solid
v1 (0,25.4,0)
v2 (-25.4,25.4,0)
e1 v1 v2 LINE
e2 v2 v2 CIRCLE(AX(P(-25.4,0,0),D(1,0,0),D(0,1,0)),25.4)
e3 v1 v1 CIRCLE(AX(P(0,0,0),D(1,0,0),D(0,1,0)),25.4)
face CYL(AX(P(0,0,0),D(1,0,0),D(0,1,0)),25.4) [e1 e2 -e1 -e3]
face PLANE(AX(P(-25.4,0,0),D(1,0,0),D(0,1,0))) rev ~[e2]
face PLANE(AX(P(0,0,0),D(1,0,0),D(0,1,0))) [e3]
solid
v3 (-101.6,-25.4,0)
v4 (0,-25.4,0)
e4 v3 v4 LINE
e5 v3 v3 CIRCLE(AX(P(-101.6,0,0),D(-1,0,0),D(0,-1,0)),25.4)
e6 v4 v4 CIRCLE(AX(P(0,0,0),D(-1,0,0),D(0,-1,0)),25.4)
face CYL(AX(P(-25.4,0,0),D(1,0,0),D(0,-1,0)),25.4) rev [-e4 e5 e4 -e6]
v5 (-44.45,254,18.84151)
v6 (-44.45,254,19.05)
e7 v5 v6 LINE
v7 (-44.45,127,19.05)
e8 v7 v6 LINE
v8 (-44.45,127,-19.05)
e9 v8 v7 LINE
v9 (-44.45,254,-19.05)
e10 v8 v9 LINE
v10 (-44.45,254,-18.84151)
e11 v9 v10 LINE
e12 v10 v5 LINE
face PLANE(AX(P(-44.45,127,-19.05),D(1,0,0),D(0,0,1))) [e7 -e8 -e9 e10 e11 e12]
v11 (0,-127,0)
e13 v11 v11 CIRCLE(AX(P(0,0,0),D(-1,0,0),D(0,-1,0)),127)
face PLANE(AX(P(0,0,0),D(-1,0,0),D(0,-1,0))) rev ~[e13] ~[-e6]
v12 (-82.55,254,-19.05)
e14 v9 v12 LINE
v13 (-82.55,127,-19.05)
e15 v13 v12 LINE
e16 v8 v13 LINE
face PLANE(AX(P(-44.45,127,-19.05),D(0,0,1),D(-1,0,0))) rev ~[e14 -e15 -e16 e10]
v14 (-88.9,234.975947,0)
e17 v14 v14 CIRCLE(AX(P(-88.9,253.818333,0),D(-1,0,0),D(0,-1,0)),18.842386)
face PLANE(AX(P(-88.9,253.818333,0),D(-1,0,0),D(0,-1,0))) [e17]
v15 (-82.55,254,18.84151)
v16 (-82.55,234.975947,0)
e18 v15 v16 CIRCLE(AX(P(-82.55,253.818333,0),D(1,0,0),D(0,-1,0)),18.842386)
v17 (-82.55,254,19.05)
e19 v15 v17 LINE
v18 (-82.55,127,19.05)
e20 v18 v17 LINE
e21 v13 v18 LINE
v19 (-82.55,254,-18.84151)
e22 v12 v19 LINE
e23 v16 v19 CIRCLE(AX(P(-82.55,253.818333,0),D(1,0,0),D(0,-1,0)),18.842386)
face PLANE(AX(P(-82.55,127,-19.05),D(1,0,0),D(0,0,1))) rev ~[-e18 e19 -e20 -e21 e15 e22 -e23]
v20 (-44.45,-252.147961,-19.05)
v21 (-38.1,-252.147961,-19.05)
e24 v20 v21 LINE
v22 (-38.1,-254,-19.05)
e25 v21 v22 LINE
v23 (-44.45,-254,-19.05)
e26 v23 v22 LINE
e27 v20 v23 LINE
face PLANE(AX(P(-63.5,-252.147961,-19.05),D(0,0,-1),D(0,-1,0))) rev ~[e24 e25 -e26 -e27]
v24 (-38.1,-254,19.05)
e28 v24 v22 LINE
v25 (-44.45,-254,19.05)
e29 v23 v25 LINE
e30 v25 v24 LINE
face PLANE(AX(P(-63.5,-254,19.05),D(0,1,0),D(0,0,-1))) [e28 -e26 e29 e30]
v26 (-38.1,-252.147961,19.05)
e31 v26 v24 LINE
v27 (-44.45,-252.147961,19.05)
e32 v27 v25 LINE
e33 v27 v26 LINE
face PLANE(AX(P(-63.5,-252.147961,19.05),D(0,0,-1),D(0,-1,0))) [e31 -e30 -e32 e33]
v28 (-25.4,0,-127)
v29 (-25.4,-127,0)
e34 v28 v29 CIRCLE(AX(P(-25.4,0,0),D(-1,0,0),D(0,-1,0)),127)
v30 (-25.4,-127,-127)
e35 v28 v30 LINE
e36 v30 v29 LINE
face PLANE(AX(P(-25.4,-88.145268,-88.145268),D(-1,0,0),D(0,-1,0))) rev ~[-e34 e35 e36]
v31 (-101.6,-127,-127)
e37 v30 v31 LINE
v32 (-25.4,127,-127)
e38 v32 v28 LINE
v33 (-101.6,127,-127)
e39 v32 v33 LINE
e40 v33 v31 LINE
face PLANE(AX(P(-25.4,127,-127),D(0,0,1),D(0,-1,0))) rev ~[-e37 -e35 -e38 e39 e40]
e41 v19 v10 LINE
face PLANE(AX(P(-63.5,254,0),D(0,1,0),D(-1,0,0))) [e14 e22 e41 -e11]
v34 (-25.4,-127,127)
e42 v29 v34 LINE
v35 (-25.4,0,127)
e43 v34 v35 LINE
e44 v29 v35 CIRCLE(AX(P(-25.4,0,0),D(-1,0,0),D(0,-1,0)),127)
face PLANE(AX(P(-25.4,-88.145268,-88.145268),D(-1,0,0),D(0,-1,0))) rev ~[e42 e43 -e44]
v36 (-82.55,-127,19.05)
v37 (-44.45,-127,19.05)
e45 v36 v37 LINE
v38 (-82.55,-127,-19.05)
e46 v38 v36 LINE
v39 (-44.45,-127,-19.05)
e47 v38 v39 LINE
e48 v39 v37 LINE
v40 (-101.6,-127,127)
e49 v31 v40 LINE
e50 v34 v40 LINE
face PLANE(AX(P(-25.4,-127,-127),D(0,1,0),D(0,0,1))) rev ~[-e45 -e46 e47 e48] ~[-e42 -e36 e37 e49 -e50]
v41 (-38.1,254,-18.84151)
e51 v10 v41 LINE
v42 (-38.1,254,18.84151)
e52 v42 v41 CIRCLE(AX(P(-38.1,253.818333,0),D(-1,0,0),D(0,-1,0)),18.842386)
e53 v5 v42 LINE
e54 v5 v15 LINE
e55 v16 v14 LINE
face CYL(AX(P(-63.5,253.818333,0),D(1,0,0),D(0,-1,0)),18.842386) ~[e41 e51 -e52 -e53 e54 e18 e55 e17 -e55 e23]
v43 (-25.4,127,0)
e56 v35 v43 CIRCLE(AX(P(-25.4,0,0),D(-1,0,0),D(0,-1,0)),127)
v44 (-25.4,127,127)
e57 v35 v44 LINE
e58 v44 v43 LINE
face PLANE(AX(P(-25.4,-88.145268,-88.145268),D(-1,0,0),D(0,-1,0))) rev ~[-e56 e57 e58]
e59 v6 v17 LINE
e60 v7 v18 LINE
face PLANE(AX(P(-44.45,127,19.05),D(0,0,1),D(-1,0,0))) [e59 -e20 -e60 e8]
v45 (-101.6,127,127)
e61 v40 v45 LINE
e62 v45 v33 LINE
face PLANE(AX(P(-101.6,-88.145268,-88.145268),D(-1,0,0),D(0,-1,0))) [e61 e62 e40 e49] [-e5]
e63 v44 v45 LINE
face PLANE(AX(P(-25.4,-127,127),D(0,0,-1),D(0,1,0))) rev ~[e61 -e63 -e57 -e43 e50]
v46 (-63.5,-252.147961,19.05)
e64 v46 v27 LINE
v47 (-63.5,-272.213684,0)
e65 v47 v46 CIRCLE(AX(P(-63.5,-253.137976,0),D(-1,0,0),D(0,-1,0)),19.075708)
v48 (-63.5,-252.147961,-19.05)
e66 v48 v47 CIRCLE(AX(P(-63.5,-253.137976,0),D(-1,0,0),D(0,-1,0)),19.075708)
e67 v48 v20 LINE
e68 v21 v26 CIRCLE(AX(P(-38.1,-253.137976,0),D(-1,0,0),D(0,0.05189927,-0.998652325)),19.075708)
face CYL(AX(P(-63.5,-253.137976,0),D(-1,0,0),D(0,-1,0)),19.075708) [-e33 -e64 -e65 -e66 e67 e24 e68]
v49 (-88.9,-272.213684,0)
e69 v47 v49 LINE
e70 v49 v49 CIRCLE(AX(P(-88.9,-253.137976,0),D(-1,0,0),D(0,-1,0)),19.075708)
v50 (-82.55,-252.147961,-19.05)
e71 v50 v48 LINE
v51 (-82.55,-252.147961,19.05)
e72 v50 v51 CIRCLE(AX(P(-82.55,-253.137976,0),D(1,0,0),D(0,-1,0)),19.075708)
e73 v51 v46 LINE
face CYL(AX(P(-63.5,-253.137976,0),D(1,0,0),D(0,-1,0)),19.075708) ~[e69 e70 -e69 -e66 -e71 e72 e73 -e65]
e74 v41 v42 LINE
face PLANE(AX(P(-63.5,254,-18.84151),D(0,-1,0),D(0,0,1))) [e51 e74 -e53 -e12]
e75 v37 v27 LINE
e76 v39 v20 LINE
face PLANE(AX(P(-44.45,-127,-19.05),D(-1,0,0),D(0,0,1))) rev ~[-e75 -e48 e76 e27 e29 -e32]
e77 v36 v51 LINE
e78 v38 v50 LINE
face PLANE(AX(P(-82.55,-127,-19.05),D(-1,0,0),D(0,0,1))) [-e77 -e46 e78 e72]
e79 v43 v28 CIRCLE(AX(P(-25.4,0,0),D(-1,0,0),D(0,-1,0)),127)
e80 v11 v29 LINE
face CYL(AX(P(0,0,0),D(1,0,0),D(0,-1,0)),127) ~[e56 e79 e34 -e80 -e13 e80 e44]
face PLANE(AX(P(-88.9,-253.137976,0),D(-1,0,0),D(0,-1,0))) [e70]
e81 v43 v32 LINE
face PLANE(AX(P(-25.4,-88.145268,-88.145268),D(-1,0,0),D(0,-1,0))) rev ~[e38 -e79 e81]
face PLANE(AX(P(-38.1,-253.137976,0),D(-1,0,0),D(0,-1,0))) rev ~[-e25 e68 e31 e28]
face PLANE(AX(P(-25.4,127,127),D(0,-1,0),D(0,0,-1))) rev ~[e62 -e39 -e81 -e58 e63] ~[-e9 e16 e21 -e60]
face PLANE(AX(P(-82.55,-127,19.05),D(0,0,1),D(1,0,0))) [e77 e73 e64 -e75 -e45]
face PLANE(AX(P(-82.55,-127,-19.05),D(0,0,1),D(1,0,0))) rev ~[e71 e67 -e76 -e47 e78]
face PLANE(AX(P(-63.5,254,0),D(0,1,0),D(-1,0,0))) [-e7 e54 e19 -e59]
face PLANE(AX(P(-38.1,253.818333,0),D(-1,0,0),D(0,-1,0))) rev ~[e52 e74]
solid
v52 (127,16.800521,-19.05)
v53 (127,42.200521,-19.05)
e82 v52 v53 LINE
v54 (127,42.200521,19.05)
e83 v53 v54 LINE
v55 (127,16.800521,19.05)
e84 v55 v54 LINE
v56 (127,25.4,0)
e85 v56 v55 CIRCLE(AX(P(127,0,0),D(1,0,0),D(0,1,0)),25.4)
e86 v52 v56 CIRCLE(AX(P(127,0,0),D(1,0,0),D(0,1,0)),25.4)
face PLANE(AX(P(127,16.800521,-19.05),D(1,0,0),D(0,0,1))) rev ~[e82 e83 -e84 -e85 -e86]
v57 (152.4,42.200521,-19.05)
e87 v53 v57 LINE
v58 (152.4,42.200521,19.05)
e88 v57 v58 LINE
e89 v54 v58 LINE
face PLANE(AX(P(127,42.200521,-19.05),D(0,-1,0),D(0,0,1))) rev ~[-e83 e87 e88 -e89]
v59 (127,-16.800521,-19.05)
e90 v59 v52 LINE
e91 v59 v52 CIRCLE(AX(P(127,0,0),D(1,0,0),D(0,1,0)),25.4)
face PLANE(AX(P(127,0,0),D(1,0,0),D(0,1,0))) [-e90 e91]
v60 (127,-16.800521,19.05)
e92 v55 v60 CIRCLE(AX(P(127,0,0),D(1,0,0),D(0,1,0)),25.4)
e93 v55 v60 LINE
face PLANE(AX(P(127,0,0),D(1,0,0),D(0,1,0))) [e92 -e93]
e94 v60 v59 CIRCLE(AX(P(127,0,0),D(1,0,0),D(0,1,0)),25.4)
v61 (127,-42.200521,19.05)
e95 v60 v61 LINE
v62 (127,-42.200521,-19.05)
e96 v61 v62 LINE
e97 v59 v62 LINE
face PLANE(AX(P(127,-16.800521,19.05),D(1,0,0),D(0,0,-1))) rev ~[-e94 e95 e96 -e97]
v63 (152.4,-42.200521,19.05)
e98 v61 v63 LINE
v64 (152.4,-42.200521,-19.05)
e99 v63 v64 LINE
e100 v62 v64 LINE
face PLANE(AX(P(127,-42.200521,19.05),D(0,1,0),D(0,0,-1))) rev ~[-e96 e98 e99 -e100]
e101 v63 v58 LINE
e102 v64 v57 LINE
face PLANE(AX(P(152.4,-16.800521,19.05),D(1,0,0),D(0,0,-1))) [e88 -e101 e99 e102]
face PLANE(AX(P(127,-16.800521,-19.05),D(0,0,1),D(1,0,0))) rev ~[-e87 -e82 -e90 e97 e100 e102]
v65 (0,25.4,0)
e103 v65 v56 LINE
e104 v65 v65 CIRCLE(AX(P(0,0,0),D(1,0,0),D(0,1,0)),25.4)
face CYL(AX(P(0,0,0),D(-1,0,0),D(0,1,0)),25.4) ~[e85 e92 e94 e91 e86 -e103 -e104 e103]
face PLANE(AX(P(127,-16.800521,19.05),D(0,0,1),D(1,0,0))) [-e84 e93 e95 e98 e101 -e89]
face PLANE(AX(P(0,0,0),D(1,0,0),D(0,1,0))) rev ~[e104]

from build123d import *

# Parameters (mm, degrees)
F0_R      = 25.4
F1_DEPTH  = 127
F3_DEPTH  = 25.4
F4_DEPTH  = 25.4
F5_DEPTH  = 25.4
F6_R      = 127
F6_R_2    = 25.4
F7_DEPTH  = 25.4
F8_DEPTH  = 25.4
F9_R      = 25.4
F10_DEPTH = 76.2
F11_W     = 38.1
F11_H     = 38.1
F12_DEPTH = 127
F13_W     = 38.1
F13_H     = 38.1
F14_DEPTH = 127
F16_R     = 18.8423860879
F17_DEPTH = 25.4
F18_DEPTH = 25.4
F19_R     = 19.0757078593
F20_DEPTH = 25.4
F21_DEPTH = 25.4


with BuildPart() as f1:
    # F0 (on Right) → F1 (new body)
    with BuildSketch(Plane.YZ):
        Circle(F0_R)
    extrude(amount=F1_DEPTH)

    # F2 (on face) → F3 (join)
    with BuildSketch(Plane.YZ.offset(127)):
        Polygon((16.8005208253, 0), (0, 0), (-16.8005208253, 0), (-16.8005208253, -19.05), (16.8005208253, -19.05), align=None)
        Polygon((-16.8005208253, 0), (0, 0), (16.8005208253, 0), (16.8005208253, 19.05), (-16.8005208253, 19.05), align=None)
    extrude(amount=F3_DEPTH)

    # F4 (add): a face of the model
    f4_faces = [f1.faces().sort_by_distance(p)[0] for p in [
        (139.7, 16.8005208253, 0),
    ]]
    extrude(f4_faces, amount=F4_DEPTH)

    # F5 (add): a face of the model
    f5_faces = [f1.faces().sort_by_distance(p)[0] for p in [
        (139.7, -16.8005208253, 0),
    ]]
    extrude(f5_faces, amount=F5_DEPTH)


with BuildPart() as f7:
    # F6 (on face) → F7 (new body)
    with BuildSketch(Plane(origin=(0, 0, 0), x_dir=(0, -1, 0), z_dir=(-1, 0, 0))):
        Circle(F6_R)
        Circle(F6_R_2, mode=Mode.SUBTRACT)
    extrude(amount=F7_DEPTH)

    # F9 (on face) → F10 (join)
    with BuildSketch(Plane(origin=(-25.4, 0, 0), x_dir=(0, -1, 0), z_dir=(-1, 0, 0))):
        with BuildLine():
            Line((1.902e-07, -127), (127, -127))
            Line((127, -127), (127, 0))
            ThreePointArc((127, 0), (89.8025612779, -89.8025611435), (1.902e-07, -127))
        make_face()
        with BuildLine():
            Line((-127, -127), (1.902e-07, -127))
            ThreePointArc((1.902e-07, -127), (-89.8025611147, -89.8025613067), (-127, -8.12e-08))
            Line((-127, -8.12e-08), (-127, -127))
        make_face()
        with BuildLine():
            ThreePointArc((-127, -8.12e-08), (-89.8025611147, -89.8025613067), (1.902e-07, -127))
            ThreePointArc((1.902e-07, -127), (89.8025612779, -89.8025611435), (127, 0))
            ThreePointArc((127, 0), (89.8025611483, 89.802561273), (-1.763e-07, 127))
            ThreePointArc((-1.763e-07, 127), (-89.8025613018, 89.8025611196), (-127, -8.12e-08))
        make_face()
        Circle(F9_R, mode=Mode.SUBTRACT)
        with BuildLine():
            ThreePointArc((-1.763e-07, 127), (89.8025611483, 89.802561273), (127, 0))
            Line((127, 0), (127, 127))
            Line((127, 127), (-1.763e-07, 127))
        make_face()
        with BuildLine():
            Line((-127, 127), (-127, -8.12e-08))
            ThreePointArc((-127, -8.12e-08), (-89.8025613018, 89.8025611196), (-1.763e-07, 127))
            Line((-1.763e-07, 127), (-127, 127))
        make_face()
    extrude(amount=F10_DEPTH)

    # F11 (on face) → F12 (join)
    with BuildSketch(Plane(origin=(0, 127, 0), x_dir=(-1, 0, 0), z_dir=(0, 1, 0))):
        with Locations((63.5, 0)):
            Rectangle(F11_W, F11_H)
    extrude(amount=F12_DEPTH)

    # F13 (on face) → F14 (join)
    with BuildSketch(Plane.XZ.offset(127)):
        with Locations((-63.5, 0)):
            Rectangle(F13_W, F13_H)
    extrude(amount=F14_DEPTH)

    # F16 (on offset) → F17 (join)
    with BuildSketch(Plane(origin=(-63.5, 0, 0), x_dir=(0, -1, 0), z_dir=(-1, 0, 0))):
        with Locations((-253.818333149, 0)):
            Circle(F16_R)
    extrude(amount=F17_DEPTH)

    # F18 (add): a face of the model
    f18_faces = [f7.faces().sort_by_distance(p)[0] for p in [
        (-63.5, 261.9135488833, 0),
    ]]
    extrude(f18_faces, amount=F18_DEPTH)

    # F19 (on offset) → F20 (join)
    with BuildSketch(Plane(origin=(-63.5, 0, 0), x_dir=(0, -1, 0), z_dir=(-1, 0, 0))):
        with Locations((253.1379759312, 0)):
            Circle(F19_R)
    extrude(amount=F20_DEPTH)

    # F21 (add): a face of the model
    f21_faces = [f7.faces().sort_by_distance(p)[0] for p in [
        (-63.5, -261.7006711899, 0),
    ]]
    extrude(f21_faces, amount=F21_DEPTH)


with BuildPart() as f8:
    # F8 (new): a face of the model
    f8_faces = [f1.part.faces().sort_by_distance(p)[0] for p in [
        (0, 0, 0),
    ]]
    extrude(f8_faces, amount=F8_DEPTH)


solid = Compound([f1.part, f7.part, f8.part])
